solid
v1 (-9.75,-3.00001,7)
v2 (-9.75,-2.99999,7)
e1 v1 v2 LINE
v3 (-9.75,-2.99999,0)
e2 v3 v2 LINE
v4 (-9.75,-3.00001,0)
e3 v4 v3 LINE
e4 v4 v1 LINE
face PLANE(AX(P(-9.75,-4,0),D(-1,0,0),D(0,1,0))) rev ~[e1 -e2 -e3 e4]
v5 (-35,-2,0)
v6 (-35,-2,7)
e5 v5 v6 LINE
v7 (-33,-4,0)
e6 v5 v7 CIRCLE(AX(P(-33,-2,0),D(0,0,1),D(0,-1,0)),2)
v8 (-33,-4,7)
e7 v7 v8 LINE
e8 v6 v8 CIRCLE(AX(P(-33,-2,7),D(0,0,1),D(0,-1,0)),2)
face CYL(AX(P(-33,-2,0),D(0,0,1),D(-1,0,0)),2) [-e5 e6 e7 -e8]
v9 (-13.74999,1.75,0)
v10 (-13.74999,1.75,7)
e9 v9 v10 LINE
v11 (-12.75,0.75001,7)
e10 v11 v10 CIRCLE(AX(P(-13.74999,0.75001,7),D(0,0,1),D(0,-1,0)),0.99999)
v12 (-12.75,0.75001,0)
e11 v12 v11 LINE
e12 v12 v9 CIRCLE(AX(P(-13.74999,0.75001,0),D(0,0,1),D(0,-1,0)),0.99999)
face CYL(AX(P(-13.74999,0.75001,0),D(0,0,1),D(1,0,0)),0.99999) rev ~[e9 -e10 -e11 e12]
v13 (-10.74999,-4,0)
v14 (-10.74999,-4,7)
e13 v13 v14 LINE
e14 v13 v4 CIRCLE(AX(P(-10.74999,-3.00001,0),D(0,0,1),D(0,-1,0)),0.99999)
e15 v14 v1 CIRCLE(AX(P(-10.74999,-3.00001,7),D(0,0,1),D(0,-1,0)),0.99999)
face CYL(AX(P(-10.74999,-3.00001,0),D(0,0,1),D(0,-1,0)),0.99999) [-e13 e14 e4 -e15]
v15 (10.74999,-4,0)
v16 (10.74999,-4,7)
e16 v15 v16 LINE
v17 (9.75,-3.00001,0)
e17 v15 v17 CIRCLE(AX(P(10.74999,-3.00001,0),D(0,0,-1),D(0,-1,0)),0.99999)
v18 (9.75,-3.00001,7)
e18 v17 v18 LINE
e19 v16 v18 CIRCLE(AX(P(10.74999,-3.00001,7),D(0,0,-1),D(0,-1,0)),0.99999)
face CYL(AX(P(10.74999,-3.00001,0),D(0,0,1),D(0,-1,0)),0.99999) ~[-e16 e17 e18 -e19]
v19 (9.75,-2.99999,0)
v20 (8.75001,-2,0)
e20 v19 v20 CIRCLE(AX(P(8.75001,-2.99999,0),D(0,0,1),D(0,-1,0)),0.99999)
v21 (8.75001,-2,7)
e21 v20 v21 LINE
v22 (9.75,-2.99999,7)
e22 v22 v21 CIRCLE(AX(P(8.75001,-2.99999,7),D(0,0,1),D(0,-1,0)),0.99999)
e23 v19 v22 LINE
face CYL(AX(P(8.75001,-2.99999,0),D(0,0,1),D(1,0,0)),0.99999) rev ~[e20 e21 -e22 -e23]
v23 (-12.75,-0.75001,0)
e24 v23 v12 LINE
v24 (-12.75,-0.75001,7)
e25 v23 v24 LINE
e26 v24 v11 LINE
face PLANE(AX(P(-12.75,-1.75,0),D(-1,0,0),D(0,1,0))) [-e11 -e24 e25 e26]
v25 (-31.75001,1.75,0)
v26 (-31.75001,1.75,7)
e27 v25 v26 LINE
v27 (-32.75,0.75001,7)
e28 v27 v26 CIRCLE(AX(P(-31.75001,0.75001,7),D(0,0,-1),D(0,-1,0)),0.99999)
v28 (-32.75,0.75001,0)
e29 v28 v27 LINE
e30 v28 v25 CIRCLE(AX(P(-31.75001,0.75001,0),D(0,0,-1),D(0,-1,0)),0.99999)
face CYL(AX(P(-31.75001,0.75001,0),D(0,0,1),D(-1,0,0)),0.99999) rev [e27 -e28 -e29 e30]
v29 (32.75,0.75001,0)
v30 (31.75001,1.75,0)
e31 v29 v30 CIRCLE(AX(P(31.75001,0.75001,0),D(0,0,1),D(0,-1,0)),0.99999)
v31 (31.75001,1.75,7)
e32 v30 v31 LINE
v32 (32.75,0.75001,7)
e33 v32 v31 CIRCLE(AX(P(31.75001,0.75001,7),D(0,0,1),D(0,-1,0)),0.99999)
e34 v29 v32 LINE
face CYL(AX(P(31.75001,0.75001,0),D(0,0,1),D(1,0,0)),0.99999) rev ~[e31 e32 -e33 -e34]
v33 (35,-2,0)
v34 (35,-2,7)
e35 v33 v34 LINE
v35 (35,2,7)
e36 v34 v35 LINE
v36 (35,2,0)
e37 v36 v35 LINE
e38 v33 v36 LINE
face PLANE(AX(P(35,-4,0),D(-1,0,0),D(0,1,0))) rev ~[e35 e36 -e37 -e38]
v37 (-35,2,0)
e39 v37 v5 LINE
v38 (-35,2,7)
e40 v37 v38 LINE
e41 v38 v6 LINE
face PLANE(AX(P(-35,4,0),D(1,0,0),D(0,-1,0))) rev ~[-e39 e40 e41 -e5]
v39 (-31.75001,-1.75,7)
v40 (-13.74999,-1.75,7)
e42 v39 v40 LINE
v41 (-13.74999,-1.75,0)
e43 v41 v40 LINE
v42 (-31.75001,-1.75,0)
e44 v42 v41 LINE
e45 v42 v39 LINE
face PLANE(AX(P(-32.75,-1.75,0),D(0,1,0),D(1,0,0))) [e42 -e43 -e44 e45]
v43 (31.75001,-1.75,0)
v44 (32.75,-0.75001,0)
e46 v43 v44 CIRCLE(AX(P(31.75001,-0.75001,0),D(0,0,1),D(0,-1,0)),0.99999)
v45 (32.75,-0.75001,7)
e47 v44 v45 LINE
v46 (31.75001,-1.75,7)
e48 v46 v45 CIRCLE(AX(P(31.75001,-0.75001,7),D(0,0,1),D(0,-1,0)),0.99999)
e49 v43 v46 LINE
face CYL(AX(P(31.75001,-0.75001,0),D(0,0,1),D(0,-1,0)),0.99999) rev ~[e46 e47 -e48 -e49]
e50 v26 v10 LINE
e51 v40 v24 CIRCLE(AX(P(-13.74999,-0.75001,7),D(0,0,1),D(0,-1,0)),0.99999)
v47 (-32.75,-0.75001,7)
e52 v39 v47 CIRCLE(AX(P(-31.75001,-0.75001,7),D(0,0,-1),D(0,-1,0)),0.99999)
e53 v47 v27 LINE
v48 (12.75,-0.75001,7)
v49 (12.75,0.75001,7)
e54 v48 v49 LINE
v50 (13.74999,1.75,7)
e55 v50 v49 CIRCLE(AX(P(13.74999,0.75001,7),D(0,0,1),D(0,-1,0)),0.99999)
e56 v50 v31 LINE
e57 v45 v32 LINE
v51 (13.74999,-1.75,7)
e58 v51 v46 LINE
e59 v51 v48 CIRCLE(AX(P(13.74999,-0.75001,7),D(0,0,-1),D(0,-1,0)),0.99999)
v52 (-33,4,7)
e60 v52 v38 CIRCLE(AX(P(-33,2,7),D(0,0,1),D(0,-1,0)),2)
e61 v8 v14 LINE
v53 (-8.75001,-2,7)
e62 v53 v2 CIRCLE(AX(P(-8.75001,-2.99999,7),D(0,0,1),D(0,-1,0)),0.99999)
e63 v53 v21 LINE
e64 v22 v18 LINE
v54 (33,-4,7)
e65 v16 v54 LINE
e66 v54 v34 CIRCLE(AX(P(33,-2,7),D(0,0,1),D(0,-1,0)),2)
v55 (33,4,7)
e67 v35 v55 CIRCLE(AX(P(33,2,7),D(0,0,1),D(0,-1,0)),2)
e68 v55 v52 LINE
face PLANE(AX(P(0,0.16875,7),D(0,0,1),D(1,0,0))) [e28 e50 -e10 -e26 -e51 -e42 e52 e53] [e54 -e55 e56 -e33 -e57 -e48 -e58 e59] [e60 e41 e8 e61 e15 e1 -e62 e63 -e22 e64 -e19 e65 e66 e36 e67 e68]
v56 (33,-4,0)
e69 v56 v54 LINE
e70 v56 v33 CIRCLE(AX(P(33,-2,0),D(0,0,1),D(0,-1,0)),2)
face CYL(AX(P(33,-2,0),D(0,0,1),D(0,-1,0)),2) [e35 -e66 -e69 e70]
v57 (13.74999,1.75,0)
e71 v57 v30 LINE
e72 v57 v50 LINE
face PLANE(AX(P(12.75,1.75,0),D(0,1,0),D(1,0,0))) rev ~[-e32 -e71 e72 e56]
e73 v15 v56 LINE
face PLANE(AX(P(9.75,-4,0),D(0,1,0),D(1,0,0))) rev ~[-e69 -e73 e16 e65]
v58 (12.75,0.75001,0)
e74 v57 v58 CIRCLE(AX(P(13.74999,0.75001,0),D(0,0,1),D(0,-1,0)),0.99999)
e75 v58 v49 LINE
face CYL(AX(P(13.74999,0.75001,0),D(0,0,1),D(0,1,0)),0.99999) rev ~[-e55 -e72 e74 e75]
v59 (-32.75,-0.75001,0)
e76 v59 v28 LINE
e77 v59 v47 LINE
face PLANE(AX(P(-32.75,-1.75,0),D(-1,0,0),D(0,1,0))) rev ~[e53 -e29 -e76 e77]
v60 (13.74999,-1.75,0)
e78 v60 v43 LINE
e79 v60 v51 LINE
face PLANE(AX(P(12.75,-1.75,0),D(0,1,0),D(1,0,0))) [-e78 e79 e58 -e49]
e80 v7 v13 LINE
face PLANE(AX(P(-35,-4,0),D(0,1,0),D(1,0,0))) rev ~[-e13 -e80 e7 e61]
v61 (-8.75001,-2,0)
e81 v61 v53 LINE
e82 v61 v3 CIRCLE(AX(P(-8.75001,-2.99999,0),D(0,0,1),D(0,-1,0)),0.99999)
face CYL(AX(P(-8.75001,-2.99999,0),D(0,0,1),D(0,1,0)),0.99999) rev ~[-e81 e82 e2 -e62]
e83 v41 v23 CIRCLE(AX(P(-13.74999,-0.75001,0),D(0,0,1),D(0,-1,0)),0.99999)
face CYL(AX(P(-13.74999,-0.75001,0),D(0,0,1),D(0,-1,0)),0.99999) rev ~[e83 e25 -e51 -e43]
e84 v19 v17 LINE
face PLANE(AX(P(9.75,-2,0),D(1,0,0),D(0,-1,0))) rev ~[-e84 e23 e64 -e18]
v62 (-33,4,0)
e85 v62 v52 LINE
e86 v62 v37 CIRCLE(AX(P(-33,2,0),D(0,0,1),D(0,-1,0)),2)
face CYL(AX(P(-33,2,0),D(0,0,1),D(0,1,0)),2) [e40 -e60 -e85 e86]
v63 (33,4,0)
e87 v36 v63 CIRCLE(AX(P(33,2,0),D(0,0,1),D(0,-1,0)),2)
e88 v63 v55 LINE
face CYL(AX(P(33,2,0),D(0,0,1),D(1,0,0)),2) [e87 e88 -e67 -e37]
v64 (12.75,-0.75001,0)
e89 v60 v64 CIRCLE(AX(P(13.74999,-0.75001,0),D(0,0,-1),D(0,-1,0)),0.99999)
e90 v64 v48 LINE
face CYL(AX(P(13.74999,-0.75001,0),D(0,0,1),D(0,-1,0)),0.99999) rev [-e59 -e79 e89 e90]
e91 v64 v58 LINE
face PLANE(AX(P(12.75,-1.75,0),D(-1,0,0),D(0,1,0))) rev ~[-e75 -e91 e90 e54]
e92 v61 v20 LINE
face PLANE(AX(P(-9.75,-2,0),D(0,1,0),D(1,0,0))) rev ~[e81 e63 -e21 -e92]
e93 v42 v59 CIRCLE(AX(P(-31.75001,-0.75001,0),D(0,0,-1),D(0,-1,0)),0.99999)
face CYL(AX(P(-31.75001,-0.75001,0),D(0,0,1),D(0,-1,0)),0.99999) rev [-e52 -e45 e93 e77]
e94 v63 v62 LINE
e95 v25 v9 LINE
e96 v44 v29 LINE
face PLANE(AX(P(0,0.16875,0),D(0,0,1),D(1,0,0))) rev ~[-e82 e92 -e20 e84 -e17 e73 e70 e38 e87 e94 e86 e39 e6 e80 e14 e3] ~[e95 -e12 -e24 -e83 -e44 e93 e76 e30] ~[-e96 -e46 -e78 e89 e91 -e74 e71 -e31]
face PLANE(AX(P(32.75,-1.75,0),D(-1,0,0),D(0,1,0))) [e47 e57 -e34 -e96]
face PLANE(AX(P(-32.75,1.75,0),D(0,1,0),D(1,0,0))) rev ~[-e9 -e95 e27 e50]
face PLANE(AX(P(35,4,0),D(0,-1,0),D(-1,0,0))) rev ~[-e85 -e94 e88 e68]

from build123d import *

# Parameters (mm, degrees)
F0_W     = 20
F0_H     = 3.5
F1_DEPTH = 7
F2_R     = 0.99999
F3_R     = 2


# Not quite as in the source:
# - two fillets or chamfers of one size are made in one step
# - a fillet or chamfer is up to 0.001 mm smaller than in the source, because OpenCascade refuses the exact size


with BuildPart() as f1:
    # F0 (on Top) → F1 (new body)
    with BuildSketch(Plane.XY):
        Polygon((35, -4), (35, 4), (-35, 4), (-35, -4), (-9.7500002012, -4), (-9.7500002012, -2), (9.75, -2), (9.75, -4), align=None)
        with Locations((-22.75, 0)):
            Rectangle(F0_W, F0_H, mode=Mode.SUBTRACT)
        with Locations((22.75, 0)):
            Rectangle(F0_W, F0_H, mode=Mode.SUBTRACT)
    extrude(amount=F1_DEPTH)

    # F2 (radius 1 in the source; OpenCascade refuses exactly that, so slightly less here)
    f2_edges = [f1.edges().sort_by_distance(p)[0] for p in [
        (32.75, 1.75, 3.5),
        (12.75, 1.75, 3.5),
        (12.75, -1.75, 3.5),
        (32.75, -1.75, 3.5),
        (-12.75, -1.75, 3.5),
        (-12.75, 1.75, 3.5),
        (-32.75, 1.75, 3.5),
        (-32.75, -1.75, 3.5),
        (-9.75, -4, 3.5),
        (-9.75, -2, 3.5),
        (9.75, -2, 3.5),
        (9.75, -4, 3.5),
    ]]
    fillet(f2_edges, radius=F2_R)

    # F3
    f3_edges = [f1.edges().sort_by_distance(p)[0] for p in [
        (35, -4, 3.5),
        (35, 4, 3.5),
        (-35, -4, 3.5),
        (-35, 4, 3.5),
    ]]
    fillet(f3_edges, radius=F3_R)


solid = f1.part
